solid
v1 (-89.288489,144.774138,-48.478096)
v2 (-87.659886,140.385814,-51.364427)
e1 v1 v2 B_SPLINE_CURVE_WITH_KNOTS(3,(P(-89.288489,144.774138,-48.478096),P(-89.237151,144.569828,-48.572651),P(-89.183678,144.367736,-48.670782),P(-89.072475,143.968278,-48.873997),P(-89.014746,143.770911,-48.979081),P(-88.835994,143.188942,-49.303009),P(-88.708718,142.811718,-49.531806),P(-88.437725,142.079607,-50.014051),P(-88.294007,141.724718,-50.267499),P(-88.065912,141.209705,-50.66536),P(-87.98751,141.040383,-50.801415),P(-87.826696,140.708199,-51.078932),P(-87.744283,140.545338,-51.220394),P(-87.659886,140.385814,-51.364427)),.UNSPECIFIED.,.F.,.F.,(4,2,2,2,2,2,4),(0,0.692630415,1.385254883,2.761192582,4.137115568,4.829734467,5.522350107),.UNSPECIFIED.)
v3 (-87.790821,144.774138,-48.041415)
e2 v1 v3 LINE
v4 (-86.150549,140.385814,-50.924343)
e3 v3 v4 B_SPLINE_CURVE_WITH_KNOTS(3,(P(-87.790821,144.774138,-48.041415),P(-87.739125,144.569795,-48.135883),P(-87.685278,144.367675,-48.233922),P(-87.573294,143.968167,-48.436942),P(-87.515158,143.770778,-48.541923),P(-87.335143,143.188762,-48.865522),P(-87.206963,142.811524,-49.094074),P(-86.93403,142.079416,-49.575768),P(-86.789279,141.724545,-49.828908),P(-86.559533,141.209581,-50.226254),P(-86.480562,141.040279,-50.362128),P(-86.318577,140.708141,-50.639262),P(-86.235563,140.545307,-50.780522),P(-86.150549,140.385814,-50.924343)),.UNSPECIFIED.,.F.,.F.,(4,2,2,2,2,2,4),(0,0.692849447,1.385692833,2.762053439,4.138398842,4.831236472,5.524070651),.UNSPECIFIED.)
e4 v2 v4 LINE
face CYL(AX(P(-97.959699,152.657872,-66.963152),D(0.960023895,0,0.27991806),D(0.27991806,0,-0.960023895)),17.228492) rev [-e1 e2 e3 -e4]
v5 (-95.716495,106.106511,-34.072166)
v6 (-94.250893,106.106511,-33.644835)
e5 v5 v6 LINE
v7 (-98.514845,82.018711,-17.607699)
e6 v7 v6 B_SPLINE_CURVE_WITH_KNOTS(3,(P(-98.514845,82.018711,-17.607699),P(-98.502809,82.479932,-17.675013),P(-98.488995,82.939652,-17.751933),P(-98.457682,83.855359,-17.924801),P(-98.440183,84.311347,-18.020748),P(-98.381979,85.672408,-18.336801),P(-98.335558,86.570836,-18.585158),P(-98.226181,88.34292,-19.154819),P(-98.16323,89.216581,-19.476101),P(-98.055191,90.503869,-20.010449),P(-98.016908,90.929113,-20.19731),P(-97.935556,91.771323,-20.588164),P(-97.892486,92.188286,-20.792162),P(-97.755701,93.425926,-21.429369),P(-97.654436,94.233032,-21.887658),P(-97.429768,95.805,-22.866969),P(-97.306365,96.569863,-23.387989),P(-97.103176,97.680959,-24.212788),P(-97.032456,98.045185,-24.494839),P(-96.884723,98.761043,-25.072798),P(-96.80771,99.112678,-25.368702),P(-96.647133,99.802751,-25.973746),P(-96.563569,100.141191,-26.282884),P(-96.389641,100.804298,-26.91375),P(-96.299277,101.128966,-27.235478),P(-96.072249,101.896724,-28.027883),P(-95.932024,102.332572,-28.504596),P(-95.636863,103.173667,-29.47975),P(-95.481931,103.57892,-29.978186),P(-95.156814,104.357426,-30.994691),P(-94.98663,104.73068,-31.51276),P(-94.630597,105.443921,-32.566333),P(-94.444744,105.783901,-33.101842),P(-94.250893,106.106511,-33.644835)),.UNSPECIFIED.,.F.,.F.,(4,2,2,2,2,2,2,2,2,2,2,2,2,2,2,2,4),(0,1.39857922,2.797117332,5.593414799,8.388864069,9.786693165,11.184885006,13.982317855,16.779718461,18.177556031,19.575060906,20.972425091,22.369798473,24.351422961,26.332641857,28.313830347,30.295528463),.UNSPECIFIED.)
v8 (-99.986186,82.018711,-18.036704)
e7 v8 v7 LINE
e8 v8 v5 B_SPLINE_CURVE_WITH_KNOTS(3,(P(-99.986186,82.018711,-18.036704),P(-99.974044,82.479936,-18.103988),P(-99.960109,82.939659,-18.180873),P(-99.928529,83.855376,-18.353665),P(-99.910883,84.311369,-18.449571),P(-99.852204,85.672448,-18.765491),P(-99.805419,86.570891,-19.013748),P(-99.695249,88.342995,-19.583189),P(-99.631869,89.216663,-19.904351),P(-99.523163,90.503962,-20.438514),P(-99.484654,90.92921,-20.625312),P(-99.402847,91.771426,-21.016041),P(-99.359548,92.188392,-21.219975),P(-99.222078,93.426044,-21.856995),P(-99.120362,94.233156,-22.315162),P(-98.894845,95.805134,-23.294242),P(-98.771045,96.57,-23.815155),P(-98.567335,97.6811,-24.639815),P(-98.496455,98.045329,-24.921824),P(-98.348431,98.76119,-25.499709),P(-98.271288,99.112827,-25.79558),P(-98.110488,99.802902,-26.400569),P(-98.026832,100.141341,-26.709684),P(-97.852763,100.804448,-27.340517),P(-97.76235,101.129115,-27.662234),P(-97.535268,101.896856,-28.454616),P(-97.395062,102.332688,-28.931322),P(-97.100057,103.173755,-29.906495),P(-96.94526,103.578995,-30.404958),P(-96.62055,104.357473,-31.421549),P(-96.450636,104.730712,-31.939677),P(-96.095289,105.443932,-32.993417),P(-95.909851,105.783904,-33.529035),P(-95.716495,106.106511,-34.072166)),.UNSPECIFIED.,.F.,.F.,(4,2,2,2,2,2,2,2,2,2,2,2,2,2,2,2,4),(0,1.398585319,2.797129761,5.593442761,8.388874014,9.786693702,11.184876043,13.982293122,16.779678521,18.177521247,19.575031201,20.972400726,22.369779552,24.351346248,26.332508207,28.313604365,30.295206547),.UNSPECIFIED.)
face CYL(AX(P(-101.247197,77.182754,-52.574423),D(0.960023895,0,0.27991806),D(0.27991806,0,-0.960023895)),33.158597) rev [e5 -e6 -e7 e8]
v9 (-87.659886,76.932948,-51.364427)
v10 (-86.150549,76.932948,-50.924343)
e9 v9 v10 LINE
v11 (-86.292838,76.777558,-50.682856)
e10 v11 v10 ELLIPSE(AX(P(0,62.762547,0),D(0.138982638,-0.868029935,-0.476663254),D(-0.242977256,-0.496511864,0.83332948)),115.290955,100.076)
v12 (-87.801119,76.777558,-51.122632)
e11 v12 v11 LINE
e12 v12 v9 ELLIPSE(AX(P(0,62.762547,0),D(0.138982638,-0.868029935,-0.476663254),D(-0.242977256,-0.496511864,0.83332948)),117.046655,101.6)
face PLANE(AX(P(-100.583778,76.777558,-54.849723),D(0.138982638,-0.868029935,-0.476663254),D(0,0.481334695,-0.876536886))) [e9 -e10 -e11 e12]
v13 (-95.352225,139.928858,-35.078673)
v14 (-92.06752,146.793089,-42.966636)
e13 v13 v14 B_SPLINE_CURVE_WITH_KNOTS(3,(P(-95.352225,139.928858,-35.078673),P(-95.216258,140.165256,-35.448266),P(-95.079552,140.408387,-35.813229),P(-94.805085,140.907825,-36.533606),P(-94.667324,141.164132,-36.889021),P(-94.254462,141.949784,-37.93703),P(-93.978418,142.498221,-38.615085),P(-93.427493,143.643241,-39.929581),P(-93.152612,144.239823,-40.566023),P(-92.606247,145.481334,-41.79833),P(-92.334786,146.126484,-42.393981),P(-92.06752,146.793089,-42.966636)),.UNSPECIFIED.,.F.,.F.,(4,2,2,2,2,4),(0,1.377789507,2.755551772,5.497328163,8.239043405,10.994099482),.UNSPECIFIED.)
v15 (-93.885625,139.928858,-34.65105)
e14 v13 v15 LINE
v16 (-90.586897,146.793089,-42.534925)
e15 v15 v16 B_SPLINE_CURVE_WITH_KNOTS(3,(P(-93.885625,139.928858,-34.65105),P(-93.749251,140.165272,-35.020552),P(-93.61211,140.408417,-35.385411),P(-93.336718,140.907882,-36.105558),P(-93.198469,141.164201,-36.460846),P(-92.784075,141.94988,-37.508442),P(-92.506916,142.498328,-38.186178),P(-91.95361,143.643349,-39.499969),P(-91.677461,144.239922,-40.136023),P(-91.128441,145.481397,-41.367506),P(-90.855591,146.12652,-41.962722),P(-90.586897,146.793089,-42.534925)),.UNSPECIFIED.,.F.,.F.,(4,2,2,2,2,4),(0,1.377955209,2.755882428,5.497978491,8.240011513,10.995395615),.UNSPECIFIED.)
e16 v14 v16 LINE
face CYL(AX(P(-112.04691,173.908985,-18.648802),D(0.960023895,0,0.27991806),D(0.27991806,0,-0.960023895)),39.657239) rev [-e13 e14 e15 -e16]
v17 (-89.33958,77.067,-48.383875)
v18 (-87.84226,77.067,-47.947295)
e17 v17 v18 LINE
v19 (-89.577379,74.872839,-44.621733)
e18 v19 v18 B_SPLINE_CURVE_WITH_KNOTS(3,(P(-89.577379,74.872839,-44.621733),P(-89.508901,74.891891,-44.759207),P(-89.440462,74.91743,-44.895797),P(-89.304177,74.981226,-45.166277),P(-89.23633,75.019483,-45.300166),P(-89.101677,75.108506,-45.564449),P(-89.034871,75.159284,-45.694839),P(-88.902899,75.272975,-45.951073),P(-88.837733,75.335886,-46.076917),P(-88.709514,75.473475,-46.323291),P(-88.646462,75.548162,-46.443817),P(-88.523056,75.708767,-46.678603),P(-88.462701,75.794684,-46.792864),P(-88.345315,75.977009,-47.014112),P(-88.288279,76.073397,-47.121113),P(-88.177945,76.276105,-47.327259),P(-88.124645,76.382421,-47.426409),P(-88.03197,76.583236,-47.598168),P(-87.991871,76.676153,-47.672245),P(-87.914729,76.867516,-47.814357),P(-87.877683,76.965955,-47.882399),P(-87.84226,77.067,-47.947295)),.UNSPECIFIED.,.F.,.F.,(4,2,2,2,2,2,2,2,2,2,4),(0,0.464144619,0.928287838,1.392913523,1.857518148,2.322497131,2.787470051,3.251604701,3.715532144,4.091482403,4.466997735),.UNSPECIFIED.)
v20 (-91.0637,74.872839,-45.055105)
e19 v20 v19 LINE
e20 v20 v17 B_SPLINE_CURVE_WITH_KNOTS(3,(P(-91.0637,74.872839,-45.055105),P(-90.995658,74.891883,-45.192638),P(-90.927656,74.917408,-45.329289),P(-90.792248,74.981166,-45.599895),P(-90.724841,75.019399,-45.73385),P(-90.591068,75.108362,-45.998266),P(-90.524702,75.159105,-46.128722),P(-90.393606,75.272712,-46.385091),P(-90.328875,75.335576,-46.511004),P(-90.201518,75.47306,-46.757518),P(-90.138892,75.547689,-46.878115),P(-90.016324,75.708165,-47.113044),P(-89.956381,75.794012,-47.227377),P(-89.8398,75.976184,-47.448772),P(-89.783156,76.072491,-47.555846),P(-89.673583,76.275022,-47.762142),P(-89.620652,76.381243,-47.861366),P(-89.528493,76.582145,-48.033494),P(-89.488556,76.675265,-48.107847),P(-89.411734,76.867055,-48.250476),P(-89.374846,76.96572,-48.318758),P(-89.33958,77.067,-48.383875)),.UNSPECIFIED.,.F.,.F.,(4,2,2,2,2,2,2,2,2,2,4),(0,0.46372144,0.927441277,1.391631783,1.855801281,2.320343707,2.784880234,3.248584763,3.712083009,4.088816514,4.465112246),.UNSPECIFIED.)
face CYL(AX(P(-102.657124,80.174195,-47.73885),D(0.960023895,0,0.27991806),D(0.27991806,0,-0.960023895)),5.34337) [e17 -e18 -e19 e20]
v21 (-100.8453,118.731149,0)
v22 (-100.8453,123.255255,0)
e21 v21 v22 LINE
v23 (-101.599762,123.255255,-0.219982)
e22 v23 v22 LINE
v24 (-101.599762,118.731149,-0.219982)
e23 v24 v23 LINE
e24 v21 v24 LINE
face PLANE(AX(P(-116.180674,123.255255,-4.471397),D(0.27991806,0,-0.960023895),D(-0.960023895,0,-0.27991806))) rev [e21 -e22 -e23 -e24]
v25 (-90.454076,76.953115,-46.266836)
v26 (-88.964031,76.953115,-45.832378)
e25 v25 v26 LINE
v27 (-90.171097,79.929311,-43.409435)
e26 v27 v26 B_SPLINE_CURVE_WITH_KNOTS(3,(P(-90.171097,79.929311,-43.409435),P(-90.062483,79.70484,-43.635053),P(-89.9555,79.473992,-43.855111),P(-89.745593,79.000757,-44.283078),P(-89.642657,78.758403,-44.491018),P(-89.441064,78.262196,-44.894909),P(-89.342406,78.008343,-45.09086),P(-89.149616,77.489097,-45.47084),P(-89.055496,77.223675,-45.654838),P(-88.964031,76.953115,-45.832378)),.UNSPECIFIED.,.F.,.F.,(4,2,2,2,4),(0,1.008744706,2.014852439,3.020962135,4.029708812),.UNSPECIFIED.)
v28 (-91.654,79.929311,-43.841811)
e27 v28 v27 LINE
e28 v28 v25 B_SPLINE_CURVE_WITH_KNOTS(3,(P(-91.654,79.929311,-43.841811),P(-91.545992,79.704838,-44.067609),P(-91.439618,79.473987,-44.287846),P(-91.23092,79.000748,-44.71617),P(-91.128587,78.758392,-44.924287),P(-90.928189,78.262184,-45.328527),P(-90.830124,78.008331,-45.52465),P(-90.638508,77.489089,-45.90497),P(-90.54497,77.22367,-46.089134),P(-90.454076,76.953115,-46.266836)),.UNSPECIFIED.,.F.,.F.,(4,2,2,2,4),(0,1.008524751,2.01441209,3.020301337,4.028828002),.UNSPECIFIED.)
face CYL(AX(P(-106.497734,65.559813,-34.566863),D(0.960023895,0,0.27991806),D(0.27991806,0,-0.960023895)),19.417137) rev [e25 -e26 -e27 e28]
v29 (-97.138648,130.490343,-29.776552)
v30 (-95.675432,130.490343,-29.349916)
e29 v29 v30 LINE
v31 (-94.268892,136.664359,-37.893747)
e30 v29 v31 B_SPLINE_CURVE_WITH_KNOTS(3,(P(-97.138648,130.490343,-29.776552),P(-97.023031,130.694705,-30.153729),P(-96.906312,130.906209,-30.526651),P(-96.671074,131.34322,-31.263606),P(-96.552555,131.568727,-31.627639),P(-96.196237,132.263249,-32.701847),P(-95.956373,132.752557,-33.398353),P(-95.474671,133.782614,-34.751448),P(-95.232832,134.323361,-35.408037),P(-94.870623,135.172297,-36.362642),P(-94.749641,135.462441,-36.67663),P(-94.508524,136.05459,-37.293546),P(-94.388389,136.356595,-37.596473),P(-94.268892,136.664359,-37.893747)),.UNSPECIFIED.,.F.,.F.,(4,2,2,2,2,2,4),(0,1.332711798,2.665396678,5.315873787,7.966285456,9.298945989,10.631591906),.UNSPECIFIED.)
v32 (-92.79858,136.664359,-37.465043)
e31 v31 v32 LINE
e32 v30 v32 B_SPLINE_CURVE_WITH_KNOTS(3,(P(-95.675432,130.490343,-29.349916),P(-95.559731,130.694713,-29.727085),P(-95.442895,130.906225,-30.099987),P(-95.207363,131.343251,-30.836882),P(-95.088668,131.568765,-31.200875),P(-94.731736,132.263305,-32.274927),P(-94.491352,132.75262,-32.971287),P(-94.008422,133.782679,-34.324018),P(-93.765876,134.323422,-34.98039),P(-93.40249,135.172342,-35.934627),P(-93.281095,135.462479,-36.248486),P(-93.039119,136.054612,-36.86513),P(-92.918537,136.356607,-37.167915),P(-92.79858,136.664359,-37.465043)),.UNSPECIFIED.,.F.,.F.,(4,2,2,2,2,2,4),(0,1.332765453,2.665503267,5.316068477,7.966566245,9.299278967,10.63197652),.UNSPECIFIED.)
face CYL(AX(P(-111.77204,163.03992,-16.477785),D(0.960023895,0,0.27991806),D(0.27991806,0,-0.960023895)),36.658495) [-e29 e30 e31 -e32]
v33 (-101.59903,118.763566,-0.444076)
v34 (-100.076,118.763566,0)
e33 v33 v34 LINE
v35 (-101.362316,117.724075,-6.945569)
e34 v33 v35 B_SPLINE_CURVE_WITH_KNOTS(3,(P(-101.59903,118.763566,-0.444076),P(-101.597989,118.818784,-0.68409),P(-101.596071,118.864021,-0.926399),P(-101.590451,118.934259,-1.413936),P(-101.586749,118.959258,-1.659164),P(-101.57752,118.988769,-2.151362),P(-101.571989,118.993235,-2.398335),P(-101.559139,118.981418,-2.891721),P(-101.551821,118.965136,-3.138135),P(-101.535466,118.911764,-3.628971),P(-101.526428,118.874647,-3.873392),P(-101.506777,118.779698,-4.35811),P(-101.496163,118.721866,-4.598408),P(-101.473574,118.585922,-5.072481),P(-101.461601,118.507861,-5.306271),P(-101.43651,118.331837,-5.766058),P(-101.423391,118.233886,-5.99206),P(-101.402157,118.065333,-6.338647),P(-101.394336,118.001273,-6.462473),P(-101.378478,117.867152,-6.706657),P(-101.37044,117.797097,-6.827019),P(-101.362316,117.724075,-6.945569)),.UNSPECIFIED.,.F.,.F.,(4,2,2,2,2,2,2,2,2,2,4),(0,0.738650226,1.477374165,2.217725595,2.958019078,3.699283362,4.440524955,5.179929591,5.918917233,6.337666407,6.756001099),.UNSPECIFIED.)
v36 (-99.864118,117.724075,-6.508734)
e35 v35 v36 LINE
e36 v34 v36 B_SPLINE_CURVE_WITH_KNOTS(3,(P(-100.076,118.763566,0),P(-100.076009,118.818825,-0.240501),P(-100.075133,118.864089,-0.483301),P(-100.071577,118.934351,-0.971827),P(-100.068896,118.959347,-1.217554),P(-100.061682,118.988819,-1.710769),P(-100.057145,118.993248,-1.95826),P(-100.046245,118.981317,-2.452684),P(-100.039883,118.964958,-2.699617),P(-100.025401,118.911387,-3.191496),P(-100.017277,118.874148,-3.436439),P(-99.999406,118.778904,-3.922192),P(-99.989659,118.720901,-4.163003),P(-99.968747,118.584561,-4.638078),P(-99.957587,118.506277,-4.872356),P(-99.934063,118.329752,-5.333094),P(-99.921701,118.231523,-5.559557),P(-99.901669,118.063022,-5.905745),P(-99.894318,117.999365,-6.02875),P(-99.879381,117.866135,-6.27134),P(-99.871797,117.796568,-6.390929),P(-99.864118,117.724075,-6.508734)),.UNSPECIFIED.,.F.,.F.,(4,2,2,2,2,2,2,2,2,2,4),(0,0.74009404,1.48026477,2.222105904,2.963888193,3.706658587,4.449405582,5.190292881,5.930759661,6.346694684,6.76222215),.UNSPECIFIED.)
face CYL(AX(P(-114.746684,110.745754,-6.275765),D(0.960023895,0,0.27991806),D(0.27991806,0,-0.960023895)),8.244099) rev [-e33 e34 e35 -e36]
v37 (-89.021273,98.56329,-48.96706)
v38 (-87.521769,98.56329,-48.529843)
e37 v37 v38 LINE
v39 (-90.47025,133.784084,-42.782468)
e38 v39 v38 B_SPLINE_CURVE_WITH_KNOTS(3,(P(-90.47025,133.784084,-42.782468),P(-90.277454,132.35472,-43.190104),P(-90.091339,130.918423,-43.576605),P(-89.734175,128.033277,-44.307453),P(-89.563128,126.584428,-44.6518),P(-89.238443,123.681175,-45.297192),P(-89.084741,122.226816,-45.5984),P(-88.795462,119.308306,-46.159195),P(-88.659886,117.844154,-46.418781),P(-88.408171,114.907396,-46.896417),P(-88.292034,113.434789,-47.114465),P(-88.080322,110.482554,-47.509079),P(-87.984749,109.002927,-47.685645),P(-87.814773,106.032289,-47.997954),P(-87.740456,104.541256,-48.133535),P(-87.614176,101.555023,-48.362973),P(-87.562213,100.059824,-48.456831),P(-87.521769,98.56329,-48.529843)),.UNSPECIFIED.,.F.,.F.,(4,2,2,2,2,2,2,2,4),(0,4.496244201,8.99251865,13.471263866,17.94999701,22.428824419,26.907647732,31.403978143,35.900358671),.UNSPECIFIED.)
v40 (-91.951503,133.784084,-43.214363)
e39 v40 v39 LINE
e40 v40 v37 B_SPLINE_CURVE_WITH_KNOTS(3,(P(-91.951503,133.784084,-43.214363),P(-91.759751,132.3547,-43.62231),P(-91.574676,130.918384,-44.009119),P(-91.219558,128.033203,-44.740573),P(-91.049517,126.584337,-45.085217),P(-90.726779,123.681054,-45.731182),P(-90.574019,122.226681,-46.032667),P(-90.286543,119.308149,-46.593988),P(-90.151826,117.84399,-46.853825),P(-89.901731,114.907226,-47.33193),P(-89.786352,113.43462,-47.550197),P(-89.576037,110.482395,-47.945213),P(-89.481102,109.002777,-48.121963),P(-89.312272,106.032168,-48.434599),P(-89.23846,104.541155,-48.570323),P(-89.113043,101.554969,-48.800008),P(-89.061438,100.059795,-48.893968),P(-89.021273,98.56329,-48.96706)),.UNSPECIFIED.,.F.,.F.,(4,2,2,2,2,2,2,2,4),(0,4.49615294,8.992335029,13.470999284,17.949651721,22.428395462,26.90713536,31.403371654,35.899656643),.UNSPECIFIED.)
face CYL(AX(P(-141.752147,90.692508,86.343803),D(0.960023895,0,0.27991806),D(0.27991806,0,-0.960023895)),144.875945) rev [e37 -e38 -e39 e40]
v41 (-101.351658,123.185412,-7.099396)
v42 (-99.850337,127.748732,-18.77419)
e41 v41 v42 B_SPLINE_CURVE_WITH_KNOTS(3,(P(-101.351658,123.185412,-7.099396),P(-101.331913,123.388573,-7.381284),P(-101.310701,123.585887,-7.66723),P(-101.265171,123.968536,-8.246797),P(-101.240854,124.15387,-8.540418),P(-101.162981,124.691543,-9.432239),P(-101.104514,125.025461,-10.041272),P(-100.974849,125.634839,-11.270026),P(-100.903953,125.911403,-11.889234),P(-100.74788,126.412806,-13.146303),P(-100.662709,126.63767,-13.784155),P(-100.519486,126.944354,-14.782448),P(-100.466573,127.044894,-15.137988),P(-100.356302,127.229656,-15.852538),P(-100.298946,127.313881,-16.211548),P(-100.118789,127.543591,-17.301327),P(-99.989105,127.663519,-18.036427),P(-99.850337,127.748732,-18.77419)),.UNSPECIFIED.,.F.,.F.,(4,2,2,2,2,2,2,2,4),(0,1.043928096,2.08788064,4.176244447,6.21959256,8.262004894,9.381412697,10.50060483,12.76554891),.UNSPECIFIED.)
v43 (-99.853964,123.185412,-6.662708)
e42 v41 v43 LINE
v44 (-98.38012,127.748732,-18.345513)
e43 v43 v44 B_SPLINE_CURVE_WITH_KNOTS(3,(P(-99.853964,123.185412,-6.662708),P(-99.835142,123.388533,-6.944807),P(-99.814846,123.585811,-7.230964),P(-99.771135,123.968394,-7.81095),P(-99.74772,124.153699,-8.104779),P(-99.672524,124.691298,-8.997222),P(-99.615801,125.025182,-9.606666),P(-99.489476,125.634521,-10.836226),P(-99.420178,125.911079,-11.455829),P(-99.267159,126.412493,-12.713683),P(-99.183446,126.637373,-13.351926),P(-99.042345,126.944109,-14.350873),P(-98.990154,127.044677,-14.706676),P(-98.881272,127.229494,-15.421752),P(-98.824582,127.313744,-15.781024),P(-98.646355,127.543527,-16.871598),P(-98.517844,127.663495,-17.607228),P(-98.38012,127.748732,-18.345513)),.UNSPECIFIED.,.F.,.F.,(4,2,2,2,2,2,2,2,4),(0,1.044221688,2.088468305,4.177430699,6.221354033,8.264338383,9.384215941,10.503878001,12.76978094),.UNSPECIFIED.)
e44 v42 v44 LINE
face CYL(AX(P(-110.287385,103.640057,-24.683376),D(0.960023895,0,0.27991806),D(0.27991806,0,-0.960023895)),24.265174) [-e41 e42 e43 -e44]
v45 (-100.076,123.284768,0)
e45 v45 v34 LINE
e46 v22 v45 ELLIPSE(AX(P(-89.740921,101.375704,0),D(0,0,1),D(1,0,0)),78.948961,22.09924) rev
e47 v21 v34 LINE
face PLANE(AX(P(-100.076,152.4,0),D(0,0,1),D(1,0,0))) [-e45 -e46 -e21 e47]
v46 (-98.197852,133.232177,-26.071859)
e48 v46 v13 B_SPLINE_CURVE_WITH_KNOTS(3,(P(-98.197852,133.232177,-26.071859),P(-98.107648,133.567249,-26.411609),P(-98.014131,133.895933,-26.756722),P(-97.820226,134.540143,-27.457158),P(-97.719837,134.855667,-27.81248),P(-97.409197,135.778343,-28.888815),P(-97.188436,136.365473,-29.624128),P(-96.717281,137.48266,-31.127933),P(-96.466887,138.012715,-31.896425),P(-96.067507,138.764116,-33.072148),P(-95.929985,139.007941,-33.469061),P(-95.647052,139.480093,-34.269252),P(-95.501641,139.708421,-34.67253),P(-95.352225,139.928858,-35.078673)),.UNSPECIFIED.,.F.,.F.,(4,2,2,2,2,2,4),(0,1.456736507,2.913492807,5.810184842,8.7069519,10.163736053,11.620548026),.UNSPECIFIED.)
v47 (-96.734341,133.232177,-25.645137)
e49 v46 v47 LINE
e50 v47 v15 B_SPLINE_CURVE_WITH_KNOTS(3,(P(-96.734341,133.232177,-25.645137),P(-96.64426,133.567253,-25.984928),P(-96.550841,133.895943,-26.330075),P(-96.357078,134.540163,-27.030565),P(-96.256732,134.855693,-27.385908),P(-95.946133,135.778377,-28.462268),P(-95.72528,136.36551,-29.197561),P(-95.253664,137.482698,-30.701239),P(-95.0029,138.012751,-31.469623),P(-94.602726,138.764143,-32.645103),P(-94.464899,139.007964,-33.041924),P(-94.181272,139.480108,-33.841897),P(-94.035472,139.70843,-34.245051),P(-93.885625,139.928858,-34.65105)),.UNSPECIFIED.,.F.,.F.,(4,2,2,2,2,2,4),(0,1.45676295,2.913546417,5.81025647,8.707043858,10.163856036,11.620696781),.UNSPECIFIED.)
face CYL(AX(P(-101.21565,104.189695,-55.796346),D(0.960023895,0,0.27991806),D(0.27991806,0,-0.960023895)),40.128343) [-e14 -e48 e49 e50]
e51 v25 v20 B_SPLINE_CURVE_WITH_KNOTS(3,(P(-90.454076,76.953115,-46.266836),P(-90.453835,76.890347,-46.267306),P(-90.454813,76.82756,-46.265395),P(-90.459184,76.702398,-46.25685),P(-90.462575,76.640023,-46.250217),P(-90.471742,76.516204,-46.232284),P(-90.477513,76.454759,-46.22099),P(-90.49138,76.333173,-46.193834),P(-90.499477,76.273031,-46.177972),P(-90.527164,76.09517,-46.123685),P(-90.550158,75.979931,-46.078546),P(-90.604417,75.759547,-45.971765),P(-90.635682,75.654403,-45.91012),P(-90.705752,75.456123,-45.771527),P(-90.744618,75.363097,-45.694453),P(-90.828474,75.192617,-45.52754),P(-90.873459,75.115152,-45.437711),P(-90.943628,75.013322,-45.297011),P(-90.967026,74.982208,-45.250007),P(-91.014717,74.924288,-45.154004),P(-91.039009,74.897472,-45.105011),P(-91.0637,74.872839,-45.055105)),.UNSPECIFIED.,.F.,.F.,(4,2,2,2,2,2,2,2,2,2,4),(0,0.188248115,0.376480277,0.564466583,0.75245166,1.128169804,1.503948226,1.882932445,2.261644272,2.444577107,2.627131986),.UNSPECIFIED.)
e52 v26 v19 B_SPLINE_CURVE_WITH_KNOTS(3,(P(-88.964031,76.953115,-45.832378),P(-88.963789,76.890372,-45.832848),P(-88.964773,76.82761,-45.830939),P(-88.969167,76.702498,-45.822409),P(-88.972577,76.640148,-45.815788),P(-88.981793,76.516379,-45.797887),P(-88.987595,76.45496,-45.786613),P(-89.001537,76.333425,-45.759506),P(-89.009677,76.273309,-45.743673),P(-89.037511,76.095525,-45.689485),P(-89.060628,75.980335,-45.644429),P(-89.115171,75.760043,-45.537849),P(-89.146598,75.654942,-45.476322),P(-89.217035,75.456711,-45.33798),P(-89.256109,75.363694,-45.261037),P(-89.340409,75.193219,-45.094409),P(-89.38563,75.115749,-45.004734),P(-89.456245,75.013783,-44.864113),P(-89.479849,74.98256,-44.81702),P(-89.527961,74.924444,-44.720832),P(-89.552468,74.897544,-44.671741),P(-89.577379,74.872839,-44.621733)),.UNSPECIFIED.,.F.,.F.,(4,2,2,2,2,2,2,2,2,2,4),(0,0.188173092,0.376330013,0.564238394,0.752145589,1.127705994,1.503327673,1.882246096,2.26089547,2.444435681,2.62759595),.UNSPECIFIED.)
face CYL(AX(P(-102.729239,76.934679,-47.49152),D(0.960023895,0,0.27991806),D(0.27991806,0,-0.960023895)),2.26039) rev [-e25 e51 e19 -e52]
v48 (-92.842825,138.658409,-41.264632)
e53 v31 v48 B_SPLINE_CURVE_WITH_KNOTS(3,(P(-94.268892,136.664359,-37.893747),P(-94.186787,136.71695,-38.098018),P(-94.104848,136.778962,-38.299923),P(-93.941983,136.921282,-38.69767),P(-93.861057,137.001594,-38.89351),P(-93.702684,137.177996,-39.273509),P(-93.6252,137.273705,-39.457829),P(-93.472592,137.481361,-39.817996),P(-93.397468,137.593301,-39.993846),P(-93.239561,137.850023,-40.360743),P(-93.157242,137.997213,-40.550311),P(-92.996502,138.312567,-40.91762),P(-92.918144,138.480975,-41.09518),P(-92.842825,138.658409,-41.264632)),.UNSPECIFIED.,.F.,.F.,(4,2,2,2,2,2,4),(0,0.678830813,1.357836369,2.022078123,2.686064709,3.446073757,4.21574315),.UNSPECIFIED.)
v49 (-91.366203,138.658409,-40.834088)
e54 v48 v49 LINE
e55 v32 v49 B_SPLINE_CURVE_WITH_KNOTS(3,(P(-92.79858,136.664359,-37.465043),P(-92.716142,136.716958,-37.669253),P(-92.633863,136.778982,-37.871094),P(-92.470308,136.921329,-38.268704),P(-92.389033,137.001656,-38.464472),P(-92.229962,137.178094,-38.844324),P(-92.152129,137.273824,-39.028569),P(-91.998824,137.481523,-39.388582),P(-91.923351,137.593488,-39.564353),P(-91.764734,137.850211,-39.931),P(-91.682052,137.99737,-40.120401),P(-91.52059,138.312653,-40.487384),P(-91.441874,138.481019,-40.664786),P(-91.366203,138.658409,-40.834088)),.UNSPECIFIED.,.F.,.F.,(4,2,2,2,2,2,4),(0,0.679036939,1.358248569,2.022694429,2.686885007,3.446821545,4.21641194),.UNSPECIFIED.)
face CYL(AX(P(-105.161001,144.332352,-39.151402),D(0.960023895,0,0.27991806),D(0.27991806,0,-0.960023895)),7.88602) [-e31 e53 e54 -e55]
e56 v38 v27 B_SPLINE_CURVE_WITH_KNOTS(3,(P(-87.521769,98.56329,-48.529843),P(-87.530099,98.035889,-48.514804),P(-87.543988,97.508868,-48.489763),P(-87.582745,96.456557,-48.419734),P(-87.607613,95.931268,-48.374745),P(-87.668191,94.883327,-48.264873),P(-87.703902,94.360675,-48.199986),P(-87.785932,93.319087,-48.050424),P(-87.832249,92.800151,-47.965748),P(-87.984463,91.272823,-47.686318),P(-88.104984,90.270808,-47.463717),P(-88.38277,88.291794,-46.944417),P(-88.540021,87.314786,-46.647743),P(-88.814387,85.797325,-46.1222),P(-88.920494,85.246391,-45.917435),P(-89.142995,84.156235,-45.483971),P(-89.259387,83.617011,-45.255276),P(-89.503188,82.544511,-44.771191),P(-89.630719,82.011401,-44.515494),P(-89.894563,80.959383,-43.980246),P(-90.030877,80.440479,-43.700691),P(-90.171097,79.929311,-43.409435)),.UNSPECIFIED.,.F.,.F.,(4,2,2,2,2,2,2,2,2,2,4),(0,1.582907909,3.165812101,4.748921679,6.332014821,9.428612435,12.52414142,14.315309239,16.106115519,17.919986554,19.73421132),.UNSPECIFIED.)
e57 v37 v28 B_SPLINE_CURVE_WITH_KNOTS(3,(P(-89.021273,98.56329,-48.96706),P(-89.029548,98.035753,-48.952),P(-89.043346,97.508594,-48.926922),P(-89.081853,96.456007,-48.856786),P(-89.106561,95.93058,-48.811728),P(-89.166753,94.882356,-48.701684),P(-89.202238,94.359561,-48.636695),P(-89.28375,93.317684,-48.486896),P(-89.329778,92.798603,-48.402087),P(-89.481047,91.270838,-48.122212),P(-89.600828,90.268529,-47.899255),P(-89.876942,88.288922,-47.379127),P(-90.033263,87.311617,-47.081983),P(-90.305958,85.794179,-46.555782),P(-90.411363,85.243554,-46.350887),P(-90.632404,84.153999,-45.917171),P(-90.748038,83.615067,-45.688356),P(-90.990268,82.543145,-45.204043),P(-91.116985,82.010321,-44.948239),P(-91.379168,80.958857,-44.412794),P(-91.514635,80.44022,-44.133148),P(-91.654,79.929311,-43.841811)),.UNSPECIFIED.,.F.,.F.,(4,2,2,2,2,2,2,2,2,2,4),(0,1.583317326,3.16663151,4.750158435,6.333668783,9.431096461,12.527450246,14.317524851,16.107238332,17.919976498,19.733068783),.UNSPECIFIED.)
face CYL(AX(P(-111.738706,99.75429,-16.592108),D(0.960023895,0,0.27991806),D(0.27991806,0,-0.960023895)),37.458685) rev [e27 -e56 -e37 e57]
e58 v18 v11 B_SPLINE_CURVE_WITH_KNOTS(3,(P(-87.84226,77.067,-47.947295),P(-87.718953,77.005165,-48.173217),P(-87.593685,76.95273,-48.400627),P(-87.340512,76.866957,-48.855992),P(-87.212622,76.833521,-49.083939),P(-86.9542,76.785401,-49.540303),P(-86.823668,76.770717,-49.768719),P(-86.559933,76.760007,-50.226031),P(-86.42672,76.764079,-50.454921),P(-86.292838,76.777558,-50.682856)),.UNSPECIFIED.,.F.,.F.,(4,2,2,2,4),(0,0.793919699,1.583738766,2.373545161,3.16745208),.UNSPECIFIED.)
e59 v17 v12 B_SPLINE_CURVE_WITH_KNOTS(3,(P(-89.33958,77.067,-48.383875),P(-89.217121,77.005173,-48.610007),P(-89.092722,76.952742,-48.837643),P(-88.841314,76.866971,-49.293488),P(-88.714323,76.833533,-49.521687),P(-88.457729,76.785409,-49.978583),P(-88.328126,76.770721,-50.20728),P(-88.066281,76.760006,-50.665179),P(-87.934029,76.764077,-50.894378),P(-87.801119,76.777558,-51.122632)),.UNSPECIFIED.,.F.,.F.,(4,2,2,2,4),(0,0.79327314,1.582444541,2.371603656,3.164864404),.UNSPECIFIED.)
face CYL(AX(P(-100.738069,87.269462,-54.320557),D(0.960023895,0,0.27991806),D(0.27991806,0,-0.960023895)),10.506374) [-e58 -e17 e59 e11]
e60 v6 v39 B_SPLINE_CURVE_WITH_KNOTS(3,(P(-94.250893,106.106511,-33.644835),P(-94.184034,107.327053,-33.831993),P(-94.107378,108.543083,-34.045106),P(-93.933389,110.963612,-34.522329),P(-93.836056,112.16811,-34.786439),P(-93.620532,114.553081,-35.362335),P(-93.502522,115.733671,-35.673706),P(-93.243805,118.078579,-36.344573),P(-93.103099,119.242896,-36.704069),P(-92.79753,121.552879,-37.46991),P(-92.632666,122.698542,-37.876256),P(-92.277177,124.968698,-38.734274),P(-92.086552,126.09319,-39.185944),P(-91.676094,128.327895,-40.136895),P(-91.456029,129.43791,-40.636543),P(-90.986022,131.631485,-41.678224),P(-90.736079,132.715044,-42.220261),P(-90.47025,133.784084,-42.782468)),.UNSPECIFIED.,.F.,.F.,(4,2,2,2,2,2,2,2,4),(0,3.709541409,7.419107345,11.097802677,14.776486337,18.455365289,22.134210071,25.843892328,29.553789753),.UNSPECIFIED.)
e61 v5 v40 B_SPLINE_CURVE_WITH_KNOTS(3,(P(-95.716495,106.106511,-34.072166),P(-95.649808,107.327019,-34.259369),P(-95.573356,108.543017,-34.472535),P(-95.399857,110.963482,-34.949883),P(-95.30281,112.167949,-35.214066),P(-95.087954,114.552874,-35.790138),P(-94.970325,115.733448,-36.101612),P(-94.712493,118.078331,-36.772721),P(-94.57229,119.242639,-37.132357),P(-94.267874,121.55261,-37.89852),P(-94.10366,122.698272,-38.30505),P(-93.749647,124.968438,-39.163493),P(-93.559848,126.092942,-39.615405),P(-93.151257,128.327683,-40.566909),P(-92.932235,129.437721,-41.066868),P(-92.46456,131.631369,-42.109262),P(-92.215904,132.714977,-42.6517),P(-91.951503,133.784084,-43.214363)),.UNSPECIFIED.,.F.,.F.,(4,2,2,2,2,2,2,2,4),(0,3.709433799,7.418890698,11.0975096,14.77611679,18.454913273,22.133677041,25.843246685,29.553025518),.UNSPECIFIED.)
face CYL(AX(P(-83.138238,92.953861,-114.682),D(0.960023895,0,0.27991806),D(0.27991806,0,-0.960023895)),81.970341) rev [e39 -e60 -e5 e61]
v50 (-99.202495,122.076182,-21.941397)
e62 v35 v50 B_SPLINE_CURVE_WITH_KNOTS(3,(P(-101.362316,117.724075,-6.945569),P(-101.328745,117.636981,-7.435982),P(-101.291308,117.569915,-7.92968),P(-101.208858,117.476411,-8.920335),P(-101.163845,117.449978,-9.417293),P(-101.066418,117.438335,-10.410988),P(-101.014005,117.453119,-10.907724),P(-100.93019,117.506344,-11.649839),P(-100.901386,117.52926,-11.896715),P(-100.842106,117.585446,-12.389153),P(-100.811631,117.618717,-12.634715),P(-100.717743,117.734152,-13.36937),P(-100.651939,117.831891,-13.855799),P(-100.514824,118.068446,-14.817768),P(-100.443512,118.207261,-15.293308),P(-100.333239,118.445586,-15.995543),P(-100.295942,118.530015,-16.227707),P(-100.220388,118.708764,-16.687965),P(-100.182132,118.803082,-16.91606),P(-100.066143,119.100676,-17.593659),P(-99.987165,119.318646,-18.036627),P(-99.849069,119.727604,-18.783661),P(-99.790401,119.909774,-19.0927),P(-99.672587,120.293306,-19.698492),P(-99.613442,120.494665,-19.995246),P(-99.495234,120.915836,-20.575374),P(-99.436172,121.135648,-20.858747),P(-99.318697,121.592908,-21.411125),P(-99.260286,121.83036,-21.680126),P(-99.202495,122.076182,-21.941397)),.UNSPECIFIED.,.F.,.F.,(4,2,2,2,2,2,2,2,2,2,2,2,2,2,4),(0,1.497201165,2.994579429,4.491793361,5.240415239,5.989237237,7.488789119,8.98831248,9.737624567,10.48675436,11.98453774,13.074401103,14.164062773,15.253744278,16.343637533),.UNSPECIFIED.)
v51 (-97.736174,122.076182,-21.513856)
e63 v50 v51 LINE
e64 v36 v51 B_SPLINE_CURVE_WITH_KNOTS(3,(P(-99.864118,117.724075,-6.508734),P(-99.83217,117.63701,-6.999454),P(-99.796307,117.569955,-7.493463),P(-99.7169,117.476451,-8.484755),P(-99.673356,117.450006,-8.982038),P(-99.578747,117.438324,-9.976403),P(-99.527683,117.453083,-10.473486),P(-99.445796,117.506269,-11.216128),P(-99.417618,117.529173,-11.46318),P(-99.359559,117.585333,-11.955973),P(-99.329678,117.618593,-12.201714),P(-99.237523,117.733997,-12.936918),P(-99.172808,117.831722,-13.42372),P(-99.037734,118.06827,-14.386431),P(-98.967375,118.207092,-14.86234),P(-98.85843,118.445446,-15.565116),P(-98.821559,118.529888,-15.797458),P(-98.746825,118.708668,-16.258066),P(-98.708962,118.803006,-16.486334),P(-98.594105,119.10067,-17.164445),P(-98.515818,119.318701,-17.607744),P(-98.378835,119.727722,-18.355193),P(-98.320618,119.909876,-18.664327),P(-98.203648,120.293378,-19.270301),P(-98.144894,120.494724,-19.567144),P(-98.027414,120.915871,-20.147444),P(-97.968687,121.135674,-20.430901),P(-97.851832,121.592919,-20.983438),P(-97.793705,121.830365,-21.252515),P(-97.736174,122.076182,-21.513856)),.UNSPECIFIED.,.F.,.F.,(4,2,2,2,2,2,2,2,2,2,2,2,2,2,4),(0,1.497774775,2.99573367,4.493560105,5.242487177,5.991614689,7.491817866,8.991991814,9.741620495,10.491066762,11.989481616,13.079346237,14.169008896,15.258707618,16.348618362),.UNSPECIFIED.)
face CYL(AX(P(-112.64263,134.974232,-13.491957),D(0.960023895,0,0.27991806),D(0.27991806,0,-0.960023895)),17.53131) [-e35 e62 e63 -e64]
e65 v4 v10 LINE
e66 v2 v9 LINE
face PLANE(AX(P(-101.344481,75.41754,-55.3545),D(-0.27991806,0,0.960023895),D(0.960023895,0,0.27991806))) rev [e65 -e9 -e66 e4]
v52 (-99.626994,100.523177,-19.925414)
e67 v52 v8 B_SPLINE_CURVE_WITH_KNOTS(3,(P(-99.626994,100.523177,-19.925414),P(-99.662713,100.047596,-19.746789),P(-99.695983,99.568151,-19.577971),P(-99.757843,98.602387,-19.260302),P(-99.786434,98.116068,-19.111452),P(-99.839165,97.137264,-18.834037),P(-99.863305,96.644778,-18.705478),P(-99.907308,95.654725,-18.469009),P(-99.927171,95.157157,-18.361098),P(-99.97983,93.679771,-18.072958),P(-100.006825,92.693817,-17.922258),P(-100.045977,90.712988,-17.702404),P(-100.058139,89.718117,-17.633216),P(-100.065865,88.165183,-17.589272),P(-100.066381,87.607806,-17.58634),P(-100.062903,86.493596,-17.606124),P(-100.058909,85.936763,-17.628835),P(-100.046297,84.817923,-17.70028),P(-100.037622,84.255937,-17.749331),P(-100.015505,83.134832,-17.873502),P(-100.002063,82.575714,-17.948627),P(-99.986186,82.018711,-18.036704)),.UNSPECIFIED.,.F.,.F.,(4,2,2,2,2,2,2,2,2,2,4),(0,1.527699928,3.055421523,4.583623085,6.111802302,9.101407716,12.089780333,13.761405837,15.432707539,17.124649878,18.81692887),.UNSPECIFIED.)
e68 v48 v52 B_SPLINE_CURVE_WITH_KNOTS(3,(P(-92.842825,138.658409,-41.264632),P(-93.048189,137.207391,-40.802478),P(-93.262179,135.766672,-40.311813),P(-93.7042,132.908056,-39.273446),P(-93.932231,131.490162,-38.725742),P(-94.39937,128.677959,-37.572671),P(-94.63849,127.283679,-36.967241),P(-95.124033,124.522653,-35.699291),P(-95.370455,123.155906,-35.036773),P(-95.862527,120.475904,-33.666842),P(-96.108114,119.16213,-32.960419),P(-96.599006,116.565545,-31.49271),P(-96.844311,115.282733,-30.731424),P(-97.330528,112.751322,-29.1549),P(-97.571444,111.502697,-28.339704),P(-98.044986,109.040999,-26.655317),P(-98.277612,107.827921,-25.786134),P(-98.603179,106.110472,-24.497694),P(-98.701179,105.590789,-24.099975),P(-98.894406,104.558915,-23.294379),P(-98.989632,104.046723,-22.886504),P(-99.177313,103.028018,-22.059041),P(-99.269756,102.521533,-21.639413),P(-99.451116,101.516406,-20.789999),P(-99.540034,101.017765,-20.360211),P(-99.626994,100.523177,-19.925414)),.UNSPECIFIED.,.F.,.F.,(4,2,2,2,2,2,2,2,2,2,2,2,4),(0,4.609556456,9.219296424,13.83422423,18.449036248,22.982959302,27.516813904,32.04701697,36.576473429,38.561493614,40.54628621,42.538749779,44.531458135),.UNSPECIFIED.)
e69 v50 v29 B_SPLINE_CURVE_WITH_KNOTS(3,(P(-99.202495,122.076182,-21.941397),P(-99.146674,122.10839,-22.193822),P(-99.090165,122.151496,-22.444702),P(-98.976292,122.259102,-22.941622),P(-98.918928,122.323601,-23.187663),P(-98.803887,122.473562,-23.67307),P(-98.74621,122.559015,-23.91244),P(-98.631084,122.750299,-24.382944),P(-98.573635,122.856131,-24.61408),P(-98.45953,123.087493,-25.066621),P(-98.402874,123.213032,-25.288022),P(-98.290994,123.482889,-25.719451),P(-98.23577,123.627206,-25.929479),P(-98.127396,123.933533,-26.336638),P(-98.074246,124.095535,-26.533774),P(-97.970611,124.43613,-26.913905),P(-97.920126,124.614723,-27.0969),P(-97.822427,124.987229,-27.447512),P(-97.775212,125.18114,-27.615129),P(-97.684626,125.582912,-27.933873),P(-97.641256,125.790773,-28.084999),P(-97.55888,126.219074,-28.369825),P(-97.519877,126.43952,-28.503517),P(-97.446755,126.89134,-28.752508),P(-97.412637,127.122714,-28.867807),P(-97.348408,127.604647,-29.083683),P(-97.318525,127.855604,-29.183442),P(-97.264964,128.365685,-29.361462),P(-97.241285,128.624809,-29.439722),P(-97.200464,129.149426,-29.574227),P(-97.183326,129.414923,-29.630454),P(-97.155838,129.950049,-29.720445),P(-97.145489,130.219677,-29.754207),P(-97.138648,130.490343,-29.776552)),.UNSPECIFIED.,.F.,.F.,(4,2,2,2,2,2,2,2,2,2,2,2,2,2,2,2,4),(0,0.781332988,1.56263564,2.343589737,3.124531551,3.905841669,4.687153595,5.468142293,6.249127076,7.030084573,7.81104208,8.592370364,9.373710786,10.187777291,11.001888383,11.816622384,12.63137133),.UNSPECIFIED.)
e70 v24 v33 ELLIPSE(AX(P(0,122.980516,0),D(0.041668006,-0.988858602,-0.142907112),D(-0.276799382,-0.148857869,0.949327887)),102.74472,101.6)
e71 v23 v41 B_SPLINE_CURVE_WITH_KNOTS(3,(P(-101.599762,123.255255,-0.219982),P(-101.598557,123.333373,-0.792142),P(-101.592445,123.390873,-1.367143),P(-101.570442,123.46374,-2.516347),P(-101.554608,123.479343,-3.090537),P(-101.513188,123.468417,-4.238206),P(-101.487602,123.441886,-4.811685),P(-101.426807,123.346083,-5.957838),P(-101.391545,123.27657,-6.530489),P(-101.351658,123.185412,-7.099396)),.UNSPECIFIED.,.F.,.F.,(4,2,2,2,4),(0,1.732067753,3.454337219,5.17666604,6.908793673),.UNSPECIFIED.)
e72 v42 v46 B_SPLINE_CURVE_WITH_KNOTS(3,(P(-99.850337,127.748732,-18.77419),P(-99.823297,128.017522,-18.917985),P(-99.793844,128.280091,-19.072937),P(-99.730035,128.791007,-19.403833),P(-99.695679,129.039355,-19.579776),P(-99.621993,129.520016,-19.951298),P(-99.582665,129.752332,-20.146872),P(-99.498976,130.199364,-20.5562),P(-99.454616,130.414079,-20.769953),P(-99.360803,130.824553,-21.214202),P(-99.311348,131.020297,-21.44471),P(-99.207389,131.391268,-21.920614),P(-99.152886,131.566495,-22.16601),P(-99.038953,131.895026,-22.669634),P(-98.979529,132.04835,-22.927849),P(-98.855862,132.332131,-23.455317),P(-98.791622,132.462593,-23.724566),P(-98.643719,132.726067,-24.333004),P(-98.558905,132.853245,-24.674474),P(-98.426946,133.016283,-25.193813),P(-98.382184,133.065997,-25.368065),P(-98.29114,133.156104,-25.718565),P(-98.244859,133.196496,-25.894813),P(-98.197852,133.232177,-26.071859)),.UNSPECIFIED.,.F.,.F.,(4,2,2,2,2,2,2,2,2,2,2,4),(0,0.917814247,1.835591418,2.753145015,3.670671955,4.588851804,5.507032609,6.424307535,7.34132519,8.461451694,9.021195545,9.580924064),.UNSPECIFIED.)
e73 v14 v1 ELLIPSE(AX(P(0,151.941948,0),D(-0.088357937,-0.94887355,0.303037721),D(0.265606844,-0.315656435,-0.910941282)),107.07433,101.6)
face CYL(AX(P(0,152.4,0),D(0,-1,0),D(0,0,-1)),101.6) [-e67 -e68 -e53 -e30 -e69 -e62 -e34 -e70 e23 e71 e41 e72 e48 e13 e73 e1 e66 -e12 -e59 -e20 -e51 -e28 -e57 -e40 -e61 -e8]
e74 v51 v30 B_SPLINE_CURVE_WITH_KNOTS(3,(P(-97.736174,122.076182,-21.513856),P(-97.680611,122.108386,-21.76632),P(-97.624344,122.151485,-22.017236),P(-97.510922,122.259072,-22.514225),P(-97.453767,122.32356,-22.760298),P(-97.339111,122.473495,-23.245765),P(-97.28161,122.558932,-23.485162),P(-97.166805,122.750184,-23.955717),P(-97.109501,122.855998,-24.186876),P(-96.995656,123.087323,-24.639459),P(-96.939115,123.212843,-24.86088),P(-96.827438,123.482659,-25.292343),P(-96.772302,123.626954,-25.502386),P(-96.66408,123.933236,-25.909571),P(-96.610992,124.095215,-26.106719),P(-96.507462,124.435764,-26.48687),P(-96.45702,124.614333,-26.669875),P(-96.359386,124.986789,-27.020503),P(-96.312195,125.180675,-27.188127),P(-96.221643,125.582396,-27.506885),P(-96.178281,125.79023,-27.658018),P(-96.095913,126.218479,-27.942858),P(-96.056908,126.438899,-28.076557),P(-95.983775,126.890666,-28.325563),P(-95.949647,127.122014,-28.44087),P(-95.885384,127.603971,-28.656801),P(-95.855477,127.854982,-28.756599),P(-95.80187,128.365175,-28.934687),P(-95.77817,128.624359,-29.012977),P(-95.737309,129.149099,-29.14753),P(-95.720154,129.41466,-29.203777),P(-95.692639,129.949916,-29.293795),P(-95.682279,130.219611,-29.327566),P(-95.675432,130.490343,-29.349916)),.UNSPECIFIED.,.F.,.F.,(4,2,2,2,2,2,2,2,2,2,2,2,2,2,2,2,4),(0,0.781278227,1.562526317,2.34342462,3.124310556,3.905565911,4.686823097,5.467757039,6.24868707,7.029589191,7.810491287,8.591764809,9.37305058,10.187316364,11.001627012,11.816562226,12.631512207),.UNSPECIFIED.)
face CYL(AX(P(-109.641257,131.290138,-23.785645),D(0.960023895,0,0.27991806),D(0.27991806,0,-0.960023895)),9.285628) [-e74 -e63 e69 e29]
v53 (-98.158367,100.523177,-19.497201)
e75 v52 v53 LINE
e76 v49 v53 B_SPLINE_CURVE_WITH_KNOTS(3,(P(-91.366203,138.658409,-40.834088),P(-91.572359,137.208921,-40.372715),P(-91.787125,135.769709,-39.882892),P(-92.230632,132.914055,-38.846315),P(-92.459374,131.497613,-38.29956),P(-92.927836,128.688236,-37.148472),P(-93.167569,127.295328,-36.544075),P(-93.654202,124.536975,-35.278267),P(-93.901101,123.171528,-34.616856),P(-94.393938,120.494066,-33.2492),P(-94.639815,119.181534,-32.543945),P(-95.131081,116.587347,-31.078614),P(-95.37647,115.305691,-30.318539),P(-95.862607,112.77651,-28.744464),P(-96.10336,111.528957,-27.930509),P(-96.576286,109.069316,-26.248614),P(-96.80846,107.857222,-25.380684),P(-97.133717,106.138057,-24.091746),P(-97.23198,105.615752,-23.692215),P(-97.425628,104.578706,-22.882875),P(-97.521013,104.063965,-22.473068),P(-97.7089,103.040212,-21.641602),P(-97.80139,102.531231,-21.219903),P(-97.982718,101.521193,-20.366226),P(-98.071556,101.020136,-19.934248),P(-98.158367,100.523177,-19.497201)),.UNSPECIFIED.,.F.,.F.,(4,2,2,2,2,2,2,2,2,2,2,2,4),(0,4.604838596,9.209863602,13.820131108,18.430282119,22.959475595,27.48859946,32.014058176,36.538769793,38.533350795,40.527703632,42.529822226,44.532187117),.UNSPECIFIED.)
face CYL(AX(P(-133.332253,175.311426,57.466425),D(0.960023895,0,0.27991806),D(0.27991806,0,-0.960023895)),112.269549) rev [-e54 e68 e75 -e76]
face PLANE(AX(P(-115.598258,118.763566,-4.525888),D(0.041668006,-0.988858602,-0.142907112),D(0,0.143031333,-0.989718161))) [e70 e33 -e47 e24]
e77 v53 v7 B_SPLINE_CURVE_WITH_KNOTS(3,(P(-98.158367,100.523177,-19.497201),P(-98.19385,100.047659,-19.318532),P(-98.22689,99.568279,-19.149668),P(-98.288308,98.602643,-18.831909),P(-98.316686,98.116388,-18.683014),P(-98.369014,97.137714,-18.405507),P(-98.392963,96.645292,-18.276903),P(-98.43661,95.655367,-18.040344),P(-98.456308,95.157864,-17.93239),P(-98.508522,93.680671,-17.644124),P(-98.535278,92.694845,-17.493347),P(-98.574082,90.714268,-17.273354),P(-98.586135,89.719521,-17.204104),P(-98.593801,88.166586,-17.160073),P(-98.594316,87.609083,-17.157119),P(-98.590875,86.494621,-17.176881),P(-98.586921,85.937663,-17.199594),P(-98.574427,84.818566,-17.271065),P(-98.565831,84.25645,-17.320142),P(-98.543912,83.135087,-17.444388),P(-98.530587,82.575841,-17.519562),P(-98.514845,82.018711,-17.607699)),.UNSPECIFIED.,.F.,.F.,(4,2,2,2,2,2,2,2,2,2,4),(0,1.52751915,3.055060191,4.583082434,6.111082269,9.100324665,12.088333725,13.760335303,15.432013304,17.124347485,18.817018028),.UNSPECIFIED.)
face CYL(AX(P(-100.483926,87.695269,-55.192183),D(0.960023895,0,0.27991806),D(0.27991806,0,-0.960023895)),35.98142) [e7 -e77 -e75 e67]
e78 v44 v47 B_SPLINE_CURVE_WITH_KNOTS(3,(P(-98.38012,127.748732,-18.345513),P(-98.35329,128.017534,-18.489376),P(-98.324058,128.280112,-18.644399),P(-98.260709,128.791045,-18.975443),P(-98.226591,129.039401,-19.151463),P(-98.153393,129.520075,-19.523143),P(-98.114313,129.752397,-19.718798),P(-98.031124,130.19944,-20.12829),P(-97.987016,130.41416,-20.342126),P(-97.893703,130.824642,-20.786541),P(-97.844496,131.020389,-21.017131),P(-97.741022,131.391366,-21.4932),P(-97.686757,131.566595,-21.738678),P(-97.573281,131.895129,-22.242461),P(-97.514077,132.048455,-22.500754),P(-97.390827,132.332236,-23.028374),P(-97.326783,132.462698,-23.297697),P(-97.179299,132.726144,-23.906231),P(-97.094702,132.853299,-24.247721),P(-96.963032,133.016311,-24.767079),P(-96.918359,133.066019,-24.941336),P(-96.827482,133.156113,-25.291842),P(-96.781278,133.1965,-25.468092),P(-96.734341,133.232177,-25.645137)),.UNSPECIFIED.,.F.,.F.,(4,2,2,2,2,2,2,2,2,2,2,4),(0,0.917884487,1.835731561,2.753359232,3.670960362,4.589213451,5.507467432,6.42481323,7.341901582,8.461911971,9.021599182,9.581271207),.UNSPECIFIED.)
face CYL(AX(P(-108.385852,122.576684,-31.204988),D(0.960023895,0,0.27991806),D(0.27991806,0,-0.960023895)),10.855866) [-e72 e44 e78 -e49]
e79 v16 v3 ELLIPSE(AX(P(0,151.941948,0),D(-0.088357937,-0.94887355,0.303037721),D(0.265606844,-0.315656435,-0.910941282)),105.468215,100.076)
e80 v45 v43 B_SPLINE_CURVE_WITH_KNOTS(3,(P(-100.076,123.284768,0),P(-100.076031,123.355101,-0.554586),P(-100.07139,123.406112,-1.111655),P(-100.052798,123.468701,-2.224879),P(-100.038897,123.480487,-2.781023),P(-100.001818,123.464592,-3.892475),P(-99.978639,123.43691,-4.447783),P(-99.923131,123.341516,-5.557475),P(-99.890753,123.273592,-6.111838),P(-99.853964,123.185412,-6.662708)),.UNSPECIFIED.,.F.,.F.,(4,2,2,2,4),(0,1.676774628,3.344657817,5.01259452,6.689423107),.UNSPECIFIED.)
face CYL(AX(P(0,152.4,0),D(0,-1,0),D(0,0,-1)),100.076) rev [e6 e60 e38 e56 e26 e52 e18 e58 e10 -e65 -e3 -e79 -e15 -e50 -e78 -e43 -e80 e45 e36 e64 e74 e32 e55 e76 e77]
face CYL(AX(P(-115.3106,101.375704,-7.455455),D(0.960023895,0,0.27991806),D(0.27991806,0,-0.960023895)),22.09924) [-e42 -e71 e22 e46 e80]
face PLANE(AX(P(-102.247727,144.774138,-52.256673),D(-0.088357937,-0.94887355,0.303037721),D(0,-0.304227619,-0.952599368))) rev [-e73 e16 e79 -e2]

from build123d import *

# Parameters (mm, degrees)
BASE_FLANGE1_DEPTH = 152.4
CUT_EXTRUDE2_DEPTH = 210.453765781
SKETCH8_OUTSIDE_W  = 91.669
SKETCH8_OUTSIDE_H  = 186.952
CUT_EXTRUDE3_DEPTH = 156.159268245
CUT_EXTRUDE5_DEPTH = 150.529804304
CUT_EXTRUDE6_DEPTH = 150.529804304


# Sheet-metal steps are written as plain solids
with BuildPart() as part:
    # Sketch1 → Base-Flange1 (new body)
    with BuildSketch(Plane(origin=(0, 0, 0), x_dir=(1, 0, 0), z_dir=(0, 1, 0))):
        with BuildLine():
            ThreePointArc((101.6, 0), (0, 101.6), (-101.6, 0))
            Line((-101.6, 0), (-100.076, 0))
            ThreePointArc((-100.076, 0), (0, 100.076), (100.076, 0))
            Line((100.076, 0), (101.6, 0))
        make_face()
    extrude(amount=BASE_FLANGE1_DEPTH)

    # Sketch7 → Cut-Extrude2 (cut, through all)
    with BuildSketch(Plane(origin=(0, 0, 0), x_dir=(1, 0, 0), z_dir=(0, 1, 0))):
        Polygon((-91.709043777, 57.490350595), (138.01260718, -58.815220223), (145.858691999, 79.364012989), (-90.642426647, 185.885465098), align=None)
    extrude(amount=CUT_EXTRUDE2_DEPTH, mode=Mode.SUBTRACT)

    # Sketch8 outside → Cut-Extrude3 (cut, through all)
    with BuildSketch(Plane(origin=(-92.234633035, 0, -26.893225996), x_dir=(-0.27991806035793976, 0, 0.9600238952679506), z_dir=(-0.9600238952679506, 0, -0.27991806035793976))):
        with Locations((-0.1185, 76.2)):
            Rectangle(SKETCH8_OUTSIDE_W, SKETCH8_OUTSIDE_H)
        with BuildLine():
            Line((28.228420724, 123.255255295), (28.228420724, 63.013426534))
            Line((28.228420724, 63.013426534), (-23.710305665, 67.943144138))
            Line((-23.710305665, 67.943144138), (-24.773491826, 75.417539706))
            Line((-24.773491826, 75.417539706), (-24.773491826, 140.385814226))
            ThreePointArc((-24.773491826, 140.385814226), (-22.985555805, 142.451644443), (-21.54666964, 144.774137995))
            Line((-21.54666964, 144.774137995), (-15.477635794, 146.793089403))
            ThreePointArc((-15.477635794, 146.793089403), (-11.468978559, 143.067294692), (-6.985554285, 139.928857844))
            ThreePointArc((-6.985554285, 139.928857844), (-2.02114191, 136.922848828), (2.45774455, 133.232177276))
            ThreePointArc((2.45774455, 133.232177276), (6.806375414, 131.32724859), (9.926241691, 127.748732402))
            ThreePointArc((9.926241691, 127.748732402), (16.039086335, 126.228175305), (21.554569405, 123.185411754))
            ThreePointArc((21.554569405, 123.185411754), (24.888843169, 123.473733589), (28.228420724, 123.255255295))
        make_face(mode=Mode.SUBTRACT)
    extrude(amount=CUT_EXTRUDE3_DEPTH, mode=Mode.SUBTRACT)

    # Sketch9 → Cut-Extrude5 (cut, through all)
    with BuildSketch(Plane(origin=(-92.234633035, 0, -26.893225996), x_dir=(-0.27991806035793976, 0, 0.9600238952679506), z_dir=(-0.9600238952679506, 0, -0.27991806035793976))):
        with BuildLine():
            Line((-24.501828907, 76.777557676), (-27.569176237, 78.5320759))
            Line((-27.569176237, 78.5320759), (-29.494089624, 68.863518536))
            Line((-29.494089624, 68.863518536), (-21.26675398, 50.764523355))
            Line((-21.26675398, 50.764523355), (28.228420724, 57.34408301))
            Line((28.228420724, 57.34408301), (28.013079808, 118.763565618))
            ThreePointArc((28.013079808, 118.763565618), (24.75429403, 118.880140281), (21.705230571, 117.724075223))
            ThreePointArc((21.705230571, 117.724075223), (13.693303318, 118.137203319), (6.704304858, 122.076182077))
            ThreePointArc((6.704304858, 122.076182077), (1.166010219, 124.850428459), (-1.395339362, 130.490343247))
            ThreePointArc((-1.395339362, 130.490343247), (-5.917319527, 133.265505392), (-9.991337743, 136.664358893))
            ThreePointArc((-9.991337743, 136.664358893), (-11.942393165, 137.4181864), (-13.626649766, 138.658409311))
            ThreePointArc((-13.626649766, 138.658409311), (-4.330180004, 118.477783543), (8.758521079, 100.523176602))
            ThreePointArc((8.758521079, 100.523176602), (10.931974112, 91.396763407), (10.672272602, 82.018710783))
            ThreePointArc((10.672272602, 82.018710783), (5.176812074, 95.990549965), (-5.917317854, 106.106510507))
            ThreePointArc((-5.917317854, 106.106510507), (-9.582838682, 120.389201142), (-15.747934485, 133.784084063))
            ThreePointArc((-15.747934485, 133.784084063), (-20.011123577, 116.370294996), (-22.090885373, 98.563290146))
            ThreePointArc((-22.090885373, 98.563290146), (-20.494324779, 88.872234651), (-16.433576157, 79.929311026))
            ThreePointArc((-16.433576157, 79.929311026), (-17.84229029, 78.509895577), (-19.097539053, 76.953114838))
            ThreePointArc((-19.097539053, 76.953114838), (-18.740022488, 75.714547524), (-17.763603379, 74.872839255))
            ThreePointArc((-17.763603379, 74.872839255), (-19.832219816, 75.585249002), (-21.44191431, 77.066999739))
            ThreePointArc((-21.44191431, 77.066999739), (-22.961230073, 76.809778861), (-24.501828907, 76.777557676))
        make_face()
    extrude(amount=CUT_EXTRUDE5_DEPTH, mode=Mode.SUBTRACT)

    # Sketch10 → Cut-Extrude6 (cut, through all)
    with BuildSketch(Plane(origin=(-92.234633035, 0, -26.893225996), x_dir=(-0.27991806035793976, 0, 0.9600238952679506), z_dir=(-0.9600238952679506, 0, -0.27991806035793976))):
        Polygon((28.013079808, 118.763565618), (28.728121694, 118.655926759), (28.728121694, 52.453532496), (22.818416534, 52.453532496), (26.943491202, 118.763565618), align=None)
    extrude(amount=CUT_EXTRUDE6_DEPTH, mode=Mode.SUBTRACT)


solid = part.part
